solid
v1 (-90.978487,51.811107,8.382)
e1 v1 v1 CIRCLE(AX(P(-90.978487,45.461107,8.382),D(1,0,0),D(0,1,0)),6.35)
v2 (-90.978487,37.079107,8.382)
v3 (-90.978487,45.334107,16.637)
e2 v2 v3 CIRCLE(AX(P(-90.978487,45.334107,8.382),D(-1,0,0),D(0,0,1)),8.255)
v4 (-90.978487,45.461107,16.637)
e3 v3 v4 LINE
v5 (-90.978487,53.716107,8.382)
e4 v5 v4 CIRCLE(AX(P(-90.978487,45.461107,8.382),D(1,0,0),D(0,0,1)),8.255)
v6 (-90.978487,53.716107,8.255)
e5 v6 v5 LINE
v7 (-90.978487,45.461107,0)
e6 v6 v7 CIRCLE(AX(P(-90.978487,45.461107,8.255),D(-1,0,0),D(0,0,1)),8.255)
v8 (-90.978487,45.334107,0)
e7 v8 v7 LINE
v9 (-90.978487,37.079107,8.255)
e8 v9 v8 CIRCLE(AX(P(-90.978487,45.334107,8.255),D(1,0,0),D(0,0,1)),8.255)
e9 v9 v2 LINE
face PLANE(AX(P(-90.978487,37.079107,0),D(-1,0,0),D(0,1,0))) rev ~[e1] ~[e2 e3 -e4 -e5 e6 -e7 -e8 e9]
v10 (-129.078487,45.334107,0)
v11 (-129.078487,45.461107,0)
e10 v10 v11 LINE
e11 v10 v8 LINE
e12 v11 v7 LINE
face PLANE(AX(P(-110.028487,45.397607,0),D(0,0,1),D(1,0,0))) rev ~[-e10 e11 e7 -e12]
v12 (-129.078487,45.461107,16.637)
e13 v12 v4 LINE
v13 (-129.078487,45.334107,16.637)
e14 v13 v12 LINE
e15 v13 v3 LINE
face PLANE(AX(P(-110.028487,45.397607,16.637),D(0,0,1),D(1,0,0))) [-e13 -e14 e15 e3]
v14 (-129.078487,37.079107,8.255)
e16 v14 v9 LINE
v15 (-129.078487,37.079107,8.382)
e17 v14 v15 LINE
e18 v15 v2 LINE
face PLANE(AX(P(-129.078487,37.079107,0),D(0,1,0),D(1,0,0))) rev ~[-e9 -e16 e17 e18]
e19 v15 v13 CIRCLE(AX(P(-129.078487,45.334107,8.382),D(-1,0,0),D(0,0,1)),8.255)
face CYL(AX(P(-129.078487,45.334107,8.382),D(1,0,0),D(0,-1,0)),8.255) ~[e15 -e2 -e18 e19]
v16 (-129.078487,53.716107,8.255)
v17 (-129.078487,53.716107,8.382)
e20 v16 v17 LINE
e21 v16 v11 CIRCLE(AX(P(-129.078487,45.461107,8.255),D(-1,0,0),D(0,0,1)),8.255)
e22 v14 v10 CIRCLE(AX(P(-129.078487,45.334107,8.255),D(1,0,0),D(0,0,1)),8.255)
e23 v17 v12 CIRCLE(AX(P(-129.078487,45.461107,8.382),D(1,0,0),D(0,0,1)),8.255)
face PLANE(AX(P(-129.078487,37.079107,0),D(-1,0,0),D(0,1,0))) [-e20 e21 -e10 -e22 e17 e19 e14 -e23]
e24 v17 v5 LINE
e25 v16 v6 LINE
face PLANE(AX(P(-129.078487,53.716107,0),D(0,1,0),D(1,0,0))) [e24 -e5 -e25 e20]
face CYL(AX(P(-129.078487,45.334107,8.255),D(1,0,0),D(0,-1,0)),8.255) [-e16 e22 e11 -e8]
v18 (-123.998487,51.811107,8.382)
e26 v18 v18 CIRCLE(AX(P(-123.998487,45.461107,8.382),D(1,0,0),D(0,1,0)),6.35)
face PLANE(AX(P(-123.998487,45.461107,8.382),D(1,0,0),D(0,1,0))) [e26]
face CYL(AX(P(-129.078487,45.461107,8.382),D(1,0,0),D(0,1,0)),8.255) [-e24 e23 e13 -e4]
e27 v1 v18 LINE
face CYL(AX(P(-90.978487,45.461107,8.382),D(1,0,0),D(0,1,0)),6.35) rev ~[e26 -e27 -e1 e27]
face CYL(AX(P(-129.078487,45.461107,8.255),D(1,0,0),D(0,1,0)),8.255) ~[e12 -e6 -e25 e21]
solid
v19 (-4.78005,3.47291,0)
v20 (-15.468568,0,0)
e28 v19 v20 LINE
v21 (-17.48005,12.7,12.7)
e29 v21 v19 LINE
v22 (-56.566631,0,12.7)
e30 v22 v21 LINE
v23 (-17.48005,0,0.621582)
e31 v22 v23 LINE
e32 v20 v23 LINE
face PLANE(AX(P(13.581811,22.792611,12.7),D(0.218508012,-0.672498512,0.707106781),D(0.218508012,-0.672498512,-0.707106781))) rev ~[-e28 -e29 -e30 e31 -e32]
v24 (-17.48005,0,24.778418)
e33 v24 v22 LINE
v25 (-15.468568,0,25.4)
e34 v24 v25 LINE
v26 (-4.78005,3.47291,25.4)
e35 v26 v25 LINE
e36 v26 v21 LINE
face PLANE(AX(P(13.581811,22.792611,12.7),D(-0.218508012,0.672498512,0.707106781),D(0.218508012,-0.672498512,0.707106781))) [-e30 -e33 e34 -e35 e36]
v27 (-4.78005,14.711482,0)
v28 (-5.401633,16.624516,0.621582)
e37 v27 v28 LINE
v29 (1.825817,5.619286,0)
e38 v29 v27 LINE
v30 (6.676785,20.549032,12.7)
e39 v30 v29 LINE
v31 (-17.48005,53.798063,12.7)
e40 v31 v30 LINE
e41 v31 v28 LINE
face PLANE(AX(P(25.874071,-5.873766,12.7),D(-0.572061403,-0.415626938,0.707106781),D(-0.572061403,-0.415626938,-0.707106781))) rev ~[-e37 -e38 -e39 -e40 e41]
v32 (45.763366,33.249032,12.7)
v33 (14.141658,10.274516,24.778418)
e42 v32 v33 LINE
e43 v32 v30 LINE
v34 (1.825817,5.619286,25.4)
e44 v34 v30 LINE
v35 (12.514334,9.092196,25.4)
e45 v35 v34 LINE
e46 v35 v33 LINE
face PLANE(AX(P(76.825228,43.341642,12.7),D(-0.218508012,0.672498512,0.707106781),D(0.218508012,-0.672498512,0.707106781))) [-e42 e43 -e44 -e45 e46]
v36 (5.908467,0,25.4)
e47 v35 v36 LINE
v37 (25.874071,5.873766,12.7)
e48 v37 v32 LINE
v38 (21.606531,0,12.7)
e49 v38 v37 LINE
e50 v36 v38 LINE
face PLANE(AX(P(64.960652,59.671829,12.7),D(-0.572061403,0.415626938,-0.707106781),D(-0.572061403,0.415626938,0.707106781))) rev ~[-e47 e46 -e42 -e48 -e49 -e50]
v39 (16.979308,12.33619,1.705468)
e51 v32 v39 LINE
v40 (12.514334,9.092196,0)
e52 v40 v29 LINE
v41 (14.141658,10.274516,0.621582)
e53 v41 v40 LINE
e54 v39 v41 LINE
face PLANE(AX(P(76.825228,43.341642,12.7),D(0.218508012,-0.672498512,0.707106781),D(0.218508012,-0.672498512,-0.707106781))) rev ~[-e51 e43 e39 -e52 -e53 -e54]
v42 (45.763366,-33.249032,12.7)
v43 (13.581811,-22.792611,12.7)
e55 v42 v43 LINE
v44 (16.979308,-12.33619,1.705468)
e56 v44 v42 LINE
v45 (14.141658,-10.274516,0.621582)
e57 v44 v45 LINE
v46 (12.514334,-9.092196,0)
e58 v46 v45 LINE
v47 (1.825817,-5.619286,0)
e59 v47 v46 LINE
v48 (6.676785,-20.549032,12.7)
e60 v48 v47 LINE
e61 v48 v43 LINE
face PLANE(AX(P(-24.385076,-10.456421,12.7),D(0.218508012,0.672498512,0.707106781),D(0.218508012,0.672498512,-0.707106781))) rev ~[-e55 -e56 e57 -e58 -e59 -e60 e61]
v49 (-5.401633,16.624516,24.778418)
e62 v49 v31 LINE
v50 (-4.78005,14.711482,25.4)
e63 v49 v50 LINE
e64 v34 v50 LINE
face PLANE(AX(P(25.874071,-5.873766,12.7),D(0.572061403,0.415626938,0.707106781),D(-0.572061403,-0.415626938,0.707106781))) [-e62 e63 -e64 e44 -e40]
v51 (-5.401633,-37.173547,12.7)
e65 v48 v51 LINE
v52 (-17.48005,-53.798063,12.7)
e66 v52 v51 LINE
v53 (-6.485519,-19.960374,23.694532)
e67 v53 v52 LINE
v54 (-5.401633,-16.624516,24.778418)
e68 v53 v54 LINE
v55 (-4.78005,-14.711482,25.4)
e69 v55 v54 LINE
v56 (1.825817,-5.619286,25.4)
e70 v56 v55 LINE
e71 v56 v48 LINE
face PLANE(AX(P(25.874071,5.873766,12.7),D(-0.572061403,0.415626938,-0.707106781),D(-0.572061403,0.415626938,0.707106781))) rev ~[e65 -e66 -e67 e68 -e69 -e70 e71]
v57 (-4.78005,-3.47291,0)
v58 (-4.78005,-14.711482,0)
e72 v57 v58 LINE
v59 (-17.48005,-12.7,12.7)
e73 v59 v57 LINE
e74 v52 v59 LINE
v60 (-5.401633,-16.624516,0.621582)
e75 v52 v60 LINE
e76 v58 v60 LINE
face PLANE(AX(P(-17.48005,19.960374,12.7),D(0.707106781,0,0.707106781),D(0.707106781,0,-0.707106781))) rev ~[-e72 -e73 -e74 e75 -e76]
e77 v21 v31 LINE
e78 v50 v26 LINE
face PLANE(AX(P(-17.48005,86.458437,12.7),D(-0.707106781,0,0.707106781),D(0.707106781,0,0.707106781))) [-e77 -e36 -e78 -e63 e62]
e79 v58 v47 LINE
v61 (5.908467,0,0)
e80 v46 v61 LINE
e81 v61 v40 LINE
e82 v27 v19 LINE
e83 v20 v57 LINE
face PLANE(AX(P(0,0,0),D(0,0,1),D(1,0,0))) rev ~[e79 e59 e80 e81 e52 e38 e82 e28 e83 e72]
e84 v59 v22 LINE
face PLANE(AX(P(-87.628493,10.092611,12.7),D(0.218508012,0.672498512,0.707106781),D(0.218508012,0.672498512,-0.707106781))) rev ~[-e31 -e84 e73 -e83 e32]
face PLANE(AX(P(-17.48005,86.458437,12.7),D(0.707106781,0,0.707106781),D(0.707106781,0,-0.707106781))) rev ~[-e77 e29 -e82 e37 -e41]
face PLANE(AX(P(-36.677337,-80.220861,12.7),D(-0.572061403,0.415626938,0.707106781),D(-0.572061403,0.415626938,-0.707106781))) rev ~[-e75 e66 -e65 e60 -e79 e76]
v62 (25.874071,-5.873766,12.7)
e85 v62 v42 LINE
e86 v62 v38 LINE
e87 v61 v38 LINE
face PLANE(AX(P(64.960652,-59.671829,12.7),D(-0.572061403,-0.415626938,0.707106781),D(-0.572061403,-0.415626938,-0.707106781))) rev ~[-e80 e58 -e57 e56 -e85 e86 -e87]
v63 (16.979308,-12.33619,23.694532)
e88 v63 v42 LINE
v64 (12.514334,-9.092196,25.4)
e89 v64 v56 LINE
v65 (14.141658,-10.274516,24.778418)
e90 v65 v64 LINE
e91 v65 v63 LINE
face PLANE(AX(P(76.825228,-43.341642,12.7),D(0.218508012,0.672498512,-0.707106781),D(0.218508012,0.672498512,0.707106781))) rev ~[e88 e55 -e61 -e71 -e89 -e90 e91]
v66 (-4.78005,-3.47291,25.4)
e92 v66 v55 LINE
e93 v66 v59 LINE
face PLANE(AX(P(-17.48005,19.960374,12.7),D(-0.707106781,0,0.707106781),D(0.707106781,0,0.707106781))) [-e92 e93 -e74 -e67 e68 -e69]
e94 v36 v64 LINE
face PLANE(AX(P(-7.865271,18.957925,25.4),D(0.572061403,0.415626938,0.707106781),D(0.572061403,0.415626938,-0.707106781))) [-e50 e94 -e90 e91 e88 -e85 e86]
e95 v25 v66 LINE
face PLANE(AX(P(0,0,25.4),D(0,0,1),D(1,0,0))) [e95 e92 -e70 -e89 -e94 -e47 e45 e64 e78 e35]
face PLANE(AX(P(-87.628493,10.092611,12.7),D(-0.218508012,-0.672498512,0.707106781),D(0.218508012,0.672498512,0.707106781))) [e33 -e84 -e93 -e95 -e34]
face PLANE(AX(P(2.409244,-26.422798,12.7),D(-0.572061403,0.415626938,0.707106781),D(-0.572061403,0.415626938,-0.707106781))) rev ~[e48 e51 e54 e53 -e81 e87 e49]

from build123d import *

# Parameters (mm, degrees)
F1_DEPTH      = 25.4
F2_T4_DEPTH   = 106.4188112086
F2_T9_DEPTH   = 106.4188112086
F2_T14_DEPTH  = 106.4188112086
F2_T19_DEPTH  = 106.4188112086
F2_T24_DEPTH  = 106.4188112086
F2_T29_DEPTH  = 106.4188112086
F2_T34_DEPTH  = 106.4188112086
F2_T39_DEPTH  = 106.4188112086
F2_T44_DEPTH  = 106.4188112086
F2_T49_DEPTH  = 106.4188112086
F2_T54_DEPTH  = 106.4188112086
F2_T59_DEPTH  = 106.4188112086
F2_T64_DEPTH  = 106.4188112086
F2_T69_DEPTH  = 106.4188112086
F2_T74_DEPTH  = 106.4188112086
F2_T79_DEPTH  = 106.4188112086
F2_T84_DEPTH  = 106.4188112086
F2_T89_DEPTH  = 106.4188112086
F2_T94_DEPTH  = 106.4188112086
F2_T99_DEPTH  = 106.4188112086
F2_T104_DEPTH = 106.4188112086
F2_T109_DEPTH = 106.4188112086
F2_T114_DEPTH = 106.4188112086
F2_T119_DEPTH = 106.4188112086
F2_T124_DEPTH = 106.4188112086
F2_T129_DEPTH = 106.4188112086
F2_T134_DEPTH = 106.4188112086
F2_T139_DEPTH = 106.4188112086
F2_T144_DEPTH = 106.4188112086
F2_T149_DEPTH = 106.4188112086
F2_T154_DEPTH = 106.4188112086
F2_T159_DEPTH = 106.4188112086
F2_T164_DEPTH = 106.4188112086
F2_T169_DEPTH = 106.4188112086
F2_T174_DEPTH = 106.4188112086
F2_T179_DEPTH = 106.4188112086
F2_T184_DEPTH = 106.4188112086
F2_T189_DEPTH = 106.4188112086
F2_T194_DEPTH = 106.4188112086
F2_T199_DEPTH = 106.4188112086
F2_T205_DEPTH = 106.4188112086
F2_T210_DEPTH = 106.4188112086
F2_T218_DEPTH = 106.4188112086
F2_T223_DEPTH = 106.4188112086
F2_T231_DEPTH = 106.4188112086
F2_T236_DEPTH = 106.4188112086
F2_T244_DEPTH = 106.4188112086
F2_T249_DEPTH = 106.4188112086
F2_T257_DEPTH = 106.4188112086
F2_T262_DEPTH = 106.4188112086
F2_T270_DEPTH = 106.4188112086
F2_T275_DEPTH = 106.4188112086
F2_T283_DEPTH = 106.4188112086
F2_T288_DEPTH = 106.4188112086
F2_T296_DEPTH = 106.4188112086
F2_T301_DEPTH = 106.4188112086
F2_T309_DEPTH = 106.4188112086
F2_T314_DEPTH = 106.4188112086
F2_T322_DEPTH = 106.4188112086
F2_T327_DEPTH = 106.4188112086
F3_W          = 38.1
F3_H          = 16.637
F4_DEPTH      = 16.637
F5_R          = 8.255
F6_R          = 6.35
F7_DEPTH      = 33.02


# Not quite as in the source:
# - a fillet or chamfer that OpenCascade refuses, or shapes differently, is made with other operations: its cross-section is extruded or revolved along the edge and cut away or added


with BuildPart() as f1:
    # F0 (on Top) → F1 (new body)
    with BuildSketch(Plane.XY):
        Polygon((45.763366046, 33.2490316571), (6.6767851239, 20.5490316571), (-17.48005039, 53.7980633142), (-17.48005039, 12.7), (-56.5666313121, 0), (-17.48005039, -12.7), (-17.48005039, -53.7980633142), (-5.401632633, -37.1735474857), (6.6767851239, -20.5490316571), (26.220075585, -26.8990316571), (45.763366046, -33.2490316571), (33.6849482891, -16.6245158286), (27.6457394106, -8.3122579143), (21.6065305321, 0), (27.6457394106, 8.3122579143), (33.6849482891, 16.6245158286), align=None)
    extrude(amount=F1_DEPTH)

    # F2: chamfer of 12.7 on 20 edges, made by hand


with BuildPart() as f2_tool2:
    # F2_s3 → F2_t4 (new body)
    with BuildSketch(Plane(origin=(82.2268601462, 26.7171264209, 0), x_dir=(0, 0, 1), z_dir=(-0.9510565163, -0.3090169944, 0))):
        Polygon((12.7, 17.48005039), (0, 4.78005039), (0, 17.48005039), align=None)
    extrude(amount=F2_T4_DEPTH)

    split(bisect_by=Plane(origin=(14.141657828, 10.2745158286, 0), x_dir=(0, 0, 1), z_dir=(0.8090169944, 0.5877852523, 0)), keep=Keep.TOP)


with BuildPart() as f1_1:
    add(f1.part)

    # F2_t1: cut F2_tool2
    add(f2_tool2.part, mode=Mode.SUBTRACT)


with BuildPart() as f2_tool7:
    # F2_s8 → F2_t9 (new body)
    with BuildSketch(Plane(origin=(82.2268601462, 26.7171264209, 0), x_dir=(0, 0, 1), z_dir=(-0.9510565163, -0.3090169944, 0))):
        Polygon((12.7, 17.48005039), (0, 4.78005039), (0, 17.48005039), align=None)
    extrude(amount=F2_T9_DEPTH)

    split(bisect_by=Plane.YZ.offset(-17.48005039), keep=Keep.BOTTOM)


with BuildPart() as f1_2:
    add(f1_1.part)

    # F2_t6: cut F2_tool7
    add(f2_tool7.part, mode=Mode.SUBTRACT)


with BuildPart() as f2_tool12:
    # F2_s13 → F2_t14 (new body)
    with BuildSketch(Plane(origin=(11.7324134364, -16.1482817373, 0), x_dir=(0, 0, 1), z_dir=(-0.5877852523, 0.8090169944, 0))):
        Polygon((12.7, 17.48005039), (0, 4.78005039), (0, 17.48005039), align=None)
    extrude(amount=F2_T14_DEPTH)

    split(bisect_by=Plane(origin=(14.141657828, -10.2745158286, 0), x_dir=(0, 0, 1), z_dir=(0.8090169944, -0.5877852523, 0)), keep=Keep.TOP)


with BuildPart() as f1_3:
    add(f1_2.part)

    # F2_t11: cut F2_tool12
    add(f2_tool12.part, mode=Mode.SUBTRACT)


with BuildPart() as f2_tool17:
    # F2_s18 → F2_t19 (new body)
    with BuildSketch(Plane(origin=(11.7324134364, -16.1482817373, 0), x_dir=(0, 0, 1), z_dir=(-0.5877852523, 0.8090169944, 0))):
        Polygon((12.7, 17.48005039), (0, 4.78005039), (0, 17.48005039), align=None)
    extrude(amount=F2_T19_DEPTH)

    split(bisect_by=Plane(origin=(-5.401632633, 16.6245158286, 0), x_dir=(0, 0, 1), z_dir=(-0.3090169944, 0.9510565163, 0)), keep=Keep.TOP)


with BuildPart() as f1_4:
    add(f1_3.part)

    # F2_t16: cut F2_tool17
    add(f2_tool17.part, mode=Mode.SUBTRACT)


with BuildPart() as f2_tool22:
    # F2_s23 → F2_t24 (new body)
    with BuildSketch(Plane.XZ.offset(-86.4584372614)):
        Polygon((-17.48005039, 12.7), (-4.78005039, 0), (-17.48005039, 0), align=None)
    extrude(amount=F2_T24_DEPTH)

    split(bisect_by=Plane(origin=(-5.401632633, 16.6245158286, 0), x_dir=(0, 0, 1), z_dir=(-0.3090169944, 0.9510565163, 0)), keep=Keep.TOP)


with BuildPart() as f1_5:
    add(f1_4.part)

    # F2_t21: cut F2_tool22
    add(f2_tool22.part, mode=Mode.SUBTRACT)


with BuildPart() as f2_tool27:
    # F2_s28 → F2_t29 (new body)
    with BuildSketch(Plane.XZ.offset(-86.4584372614)):
        Polygon((-17.48005039, 12.7), (-4.78005039, 0), (-17.48005039, 0), align=None)
    extrude(amount=F2_T29_DEPTH)

    split(bisect_by=Plane(origin=(-5.401632633, -16.6245158286, 0), x_dir=(0, 0, 1), z_dir=(-0.3090169944, -0.9510565163, 0)), keep=Keep.TOP)


with BuildPart() as f1_6:
    add(f1_5.part)

    # F2_t26: cut F2_tool27
    add(f2_tool27.part, mode=Mode.SUBTRACT)


with BuildPart() as f2_tool32:
    # F2_s33 → F2_t34 (new body)
    with BuildSketch(Plane(origin=(18.9834437101, 6.1680947638, 0), x_dir=(0, 0, 1), z_dir=(-0.9510565163, -0.3090169944, 0))):
        Polygon((12.7, 17.48005039), (0, 4.78005039), (0, 17.48005039), align=None)
    extrude(amount=F2_T34_DEPTH)

    split(bisect_by=Plane(origin=(14.141657828, 10.2745158286, 0), x_dir=(0, 0, 1), z_dir=(0.8090169944, 0.5877852523, 0)), keep=Keep.TOP)


with BuildPart() as f1_7:
    add(f1_6.part)

    # F2_t31: cut F2_tool32
    add(f2_tool32.part, mode=Mode.SUBTRACT)


with BuildPart() as f2_tool37:
    # F2_s38 → F2_t39 (new body)
    with BuildSketch(Plane(origin=(18.9834437101, 6.1680947638, 0), x_dir=(0, 0, 1), z_dir=(-0.9510565163, -0.3090169944, 0))):
        Polygon((12.7, 17.48005039), (0, 4.78005039), (0, 17.48005039), align=None)
    extrude(amount=F2_T39_DEPTH)

    split(bisect_by=Plane.YZ.offset(-17.48005039), keep=Keep.BOTTOM)


with BuildPart() as f1_8:
    add(f1_7.part)

    # F2_t36: cut F2_tool37
    add(f2_tool37.part, mode=Mode.SUBTRACT)


with BuildPart() as f2_tool42:
    # F2_s43 → F2_t44 (new body)
    with BuildSketch(Plane(origin=(-82.2268601462, 26.7171264209, 0), x_dir=(0, 0, 1), z_dir=(0.9510565163, -0.3090169944, 0))):
        Polygon((12.7, 17.48005039), (0, 4.78005039), (0, 17.48005039), align=None)
    extrude(amount=F2_T44_DEPTH)

    split(bisect_by=Plane.YZ.offset(-17.48005039), keep=Keep.BOTTOM)


with BuildPart() as f1_9:
    add(f1_8.part)

    # F2_t41: cut F2_tool42
    add(f2_tool42.part, mode=Mode.SUBTRACT)


with BuildPart() as f2_tool47:
    # F2_s48 → F2_t49 (new body)
    with BuildSketch(Plane(origin=(-82.2268601462, 26.7171264209, 0), x_dir=(0, 0, 1), z_dir=(0.9510565163, -0.3090169944, 0))):
        Polygon((12.7, 17.48005039), (0, 4.78005039), (0, 17.48005039), align=None)
    extrude(amount=F2_T49_DEPTH)

    split(bisect_by=Plane(origin=(14.141657828, -10.2745158286, 0), x_dir=(0, 0, 1), z_dir=(0.8090169944, -0.5877852523, 0)), keep=Keep.TOP)


with BuildPart() as f1_10:
    add(f1_9.part)

    # F2_t46: cut F2_tool47
    add(f2_tool47.part, mode=Mode.SUBTRACT)


with BuildPart() as f2_tool52:
    # F2_s53 → F2_t54 (new body)
    with BuildSketch(Plane.XZ.offset(-19.9603739472)):
        Polygon((-17.48005039, 12.7), (-4.78005039, 0), (-17.48005039, 0), align=None)
    extrude(amount=F2_T54_DEPTH)

    split(bisect_by=Plane(origin=(-5.401632633, 16.6245158286, 0), x_dir=(0, 0, 1), z_dir=(-0.3090169944, 0.9510565163, 0)), keep=Keep.TOP)


with BuildPart() as f1_11:
    add(f1_10.part)

    # F2_t51: cut F2_tool52
    add(f2_tool52.part, mode=Mode.SUBTRACT)


with BuildPart() as f2_tool57:
    # F2_s58 → F2_t59 (new body)
    with BuildSketch(Plane.XZ.offset(-19.9603739472)):
        Polygon((-17.48005039, 12.7), (-4.78005039, 0), (-17.48005039, 0), align=None)
    extrude(amount=F2_T59_DEPTH)

    split(bisect_by=Plane(origin=(-5.401632633, -16.6245158286, 0), x_dir=(0, 0, 1), z_dir=(-0.3090169944, -0.9510565163, 0)), keep=Keep.TOP)


with BuildPart() as f1_12:
    add(f1_11.part)

    # F2_t56: cut F2_tool57
    add(f2_tool57.part, mode=Mode.SUBTRACT)


with BuildPart() as f2_tool62:
    # F2_s63 → F2_t64 (new body)
    with BuildSketch(Plane(origin=(-50.8189943585, -69.9463450516, 0), x_dir=(0, 0, 1), z_dir=(0.5877852523, 0.8090169944, 0))):
        Polygon((12.7, 17.48005039), (0, 4.78005039), (0, 17.48005039), align=None)
    extrude(amount=F2_T64_DEPTH)

    split(bisect_by=Plane(origin=(-5.401632633, -16.6245158286, 0), x_dir=(0, 0, 1), z_dir=(-0.3090169944, -0.9510565163, 0)), keep=Keep.TOP)


with BuildPart() as f1_13:
    add(f1_12.part)

    # F2_t61: cut F2_tool62
    add(f2_tool62.part, mode=Mode.SUBTRACT)


with BuildPart() as f2_tool67:
    # F2_s68 → F2_t69 (new body)
    with BuildSketch(Plane(origin=(-50.8189943585, -69.9463450516, 0), x_dir=(0, 0, 1), z_dir=(0.5877852523, 0.8090169944, 0))):
        Polygon((12.7, 17.48005039), (0, 4.78005039), (0, 17.48005039), align=None)
    extrude(amount=F2_T69_DEPTH)

    split(bisect_by=Plane(origin=(14.141657828, 10.2745158286, 0), x_dir=(0, 0, 1), z_dir=(0.8090169944, 0.5877852523, 0)), keep=Keep.TOP)


with BuildPart() as f1_14:
    add(f1_13.part)

    # F2_t66: cut F2_tool67
    add(f2_tool67.part, mode=Mode.SUBTRACT)


with BuildPart() as f2_tool72:
    # F2_s73 → F2_t74 (new body)
    with BuildSketch(Plane(origin=(-18.9834437101, 6.1680947638, 0), x_dir=(0, 0, 1), z_dir=(0.9510565163, -0.3090169944, 0))):
        Polygon((12.7, 17.48005039), (0, 4.78005039), (0, 17.48005039), align=None)
    extrude(amount=F2_T74_DEPTH)

    split(bisect_by=Plane.YZ.offset(-17.48005039), keep=Keep.BOTTOM)


with BuildPart() as f1_15:
    add(f1_14.part)

    # F2_t71: cut F2_tool72
    add(f2_tool72.part, mode=Mode.SUBTRACT)


with BuildPart() as f2_tool77:
    # F2_s78 → F2_t79 (new body)
    with BuildSketch(Plane(origin=(-18.9834437101, 6.1680947638, 0), x_dir=(0, 0, 1), z_dir=(0.9510565163, -0.3090169944, 0))):
        Polygon((12.7, 17.48005039), (0, 4.78005039), (0, 17.48005039), align=None)
    extrude(amount=F2_T79_DEPTH)

    split(bisect_by=Plane(origin=(14.141657828, -10.2745158286, 0), x_dir=(0, 0, 1), z_dir=(0.8090169944, -0.5877852523, 0)), keep=Keep.TOP)


with BuildPart() as f1_16:
    add(f1_15.part)

    # F2_t76: cut F2_tool77
    add(f2_tool77.part, mode=Mode.SUBTRACT)


with BuildPart() as f2_tool82:
    # F2_s83 → F2_t84 (new body)
    with BuildSketch(Plane(origin=(50.8189943585, -69.9463450516, 0), x_dir=(0, 0, 1), z_dir=(-0.5877852523, 0.8090169944, 0))):
        Polygon((12.7, 17.48005039), (0, 4.78005039), (0, 17.48005039), align=None)
    extrude(amount=F2_T84_DEPTH)

    split(bisect_by=Plane(origin=(14.141657828, -10.2745158286, 0), x_dir=(0, 0, 1), z_dir=(0.8090169944, -0.5877852523, 0)), keep=Keep.TOP)


with BuildPart() as f1_17:
    add(f1_16.part)

    # F2_t81: cut F2_tool82
    add(f2_tool82.part, mode=Mode.SUBTRACT)


with BuildPart() as f2_tool87:
    # F2_s88 → F2_t89 (new body)
    with BuildSketch(Plane(origin=(50.8189943585, -69.9463450516, 0), x_dir=(0, 0, 1), z_dir=(-0.5877852523, 0.8090169944, 0))):
        Polygon((12.7, 17.48005039), (0, 4.78005039), (0, 17.48005039), align=None)
    extrude(amount=F2_T89_DEPTH)

    split(bisect_by=Plane(origin=(-5.401632633, 16.6245158286, 0), x_dir=(0, 0, 1), z_dir=(-0.3090169944, 0.9510565163, 0)), keep=Keep.TOP)


with BuildPart() as f1_18:
    add(f1_17.part)

    # F2_t86: cut F2_tool87
    add(f2_tool87.part, mode=Mode.SUBTRACT)


with BuildPart() as f2_tool92:
    # F2_s93 → F2_t94 (new body)
    with BuildSketch(Plane(origin=(-11.7324134364, -16.1482817373, 0), x_dir=(0, 0, 1), z_dir=(0.5877852523, 0.8090169944, 0))):
        Polygon((12.7, 17.48005039), (0, 4.78005039), (0, 17.48005039), align=None)
    extrude(amount=F2_T94_DEPTH)

    split(bisect_by=Plane(origin=(-5.401632633, -16.6245158286, 0), x_dir=(0, 0, 1), z_dir=(-0.3090169944, -0.9510565163, 0)), keep=Keep.TOP)


with BuildPart() as f1_19:
    add(f1_18.part)

    # F2_t91: cut F2_tool92
    add(f2_tool92.part, mode=Mode.SUBTRACT)


with BuildPart() as f2_tool97:
    # F2_s98 → F2_t99 (new body)
    with BuildSketch(Plane(origin=(-11.7324134364, -16.1482817373, 0), x_dir=(0, 0, 1), z_dir=(0.5877852523, 0.8090169944, 0))):
        Polygon((12.7, 17.48005039), (0, 4.78005039), (0, 17.48005039), align=None)
    extrude(amount=F2_T99_DEPTH)

    split(bisect_by=Plane(origin=(14.141657828, 10.2745158286, 0), x_dir=(0, 0, 1), z_dir=(0.8090169944, 0.5877852523, 0)), keep=Keep.TOP)


with BuildPart() as f1_20:
    add(f1_19.part)

    # F2_t96: cut F2_tool97
    add(f2_tool97.part, mode=Mode.SUBTRACT)


with BuildPart() as f2_tool102:
    # F2_s103 → F2_t104 (new body)
    with BuildSketch(Plane(origin=(50.8189943585, 69.9463450516, 0), x_dir=(0, 0, 1), z_dir=(-0.5877852523, -0.8090169944, 0))):
        Polygon((12.7, -17.48005039), (25.4, -4.78005039), (25.4, -17.48005039), align=None)
    extrude(amount=F2_T104_DEPTH)

    split(bisect_by=Plane(origin=(14.141657828, 10.2745158286, 0), x_dir=(0, 0, 1), z_dir=(0.8090169944, 0.5877852523, 0)), keep=Keep.TOP)


with BuildPart() as f1_21:
    add(f1_20.part)

    # F2_t101: cut F2_tool102
    add(f2_tool102.part, mode=Mode.SUBTRACT)


with BuildPart() as f2_tool107:
    # F2_s108 → F2_t109 (new body)
    with BuildSketch(Plane(origin=(50.8189943585, 69.9463450516, 0), x_dir=(0, 0, 1), z_dir=(-0.5877852523, -0.8090169944, 0))):
        Polygon((12.7, -17.48005039), (25.4, -4.78005039), (25.4, -17.48005039), align=None)
    extrude(amount=F2_T109_DEPTH)

    split(bisect_by=Plane(origin=(-5.401632633, -16.6245158286, 0), x_dir=(0, 0, 1), z_dir=(-0.3090169944, -0.9510565163, 0)), keep=Keep.TOP)


with BuildPart() as f1_22:
    add(f1_21.part)

    # F2_t106: cut F2_tool107
    add(f2_tool107.part, mode=Mode.SUBTRACT)


with BuildPart() as f2_tool112:
    # F2_s113 → F2_t114 (new body)
    with BuildSketch(Plane(origin=(82.2268601462, 26.7171264209, 0), x_dir=(0, 0, 1), z_dir=(-0.9510565163, -0.3090169944, 0))):
        Polygon((12.7, 17.48005039), (25.4, 4.78005039), (25.4, 17.48005039), align=None)
    extrude(amount=F2_T114_DEPTH)

    split(bisect_by=Plane(origin=(14.141657828, 10.2745158286, 0), x_dir=(0, 0, 1), z_dir=(0.8090169944, 0.5877852523, 0)), keep=Keep.TOP)


with BuildPart() as f1_23:
    add(f1_22.part)

    # F2_t111: cut F2_tool112
    add(f2_tool112.part, mode=Mode.SUBTRACT)


with BuildPart() as f2_tool117:
    # F2_s118 → F2_t119 (new body)
    with BuildSketch(Plane(origin=(82.2268601462, 26.7171264209, 0), x_dir=(0, 0, 1), z_dir=(-0.9510565163, -0.3090169944, 0))):
        Polygon((12.7, 17.48005039), (25.4, 4.78005039), (25.4, 17.48005039), align=None)
    extrude(amount=F2_T119_DEPTH)

    split(bisect_by=Plane.YZ.offset(-17.48005039), keep=Keep.BOTTOM)


with BuildPart() as f1_24:
    add(f1_23.part)

    # F2_t116: cut F2_tool117
    add(f2_tool117.part, mode=Mode.SUBTRACT)


with BuildPart() as f2_tool122:
    # F2_s123 → F2_t124 (new body)
    with BuildSketch(Plane(origin=(11.7324134364, -16.1482817373, 0), x_dir=(0, 0, 1), z_dir=(-0.5877852523, 0.8090169944, 0))):
        Polygon((12.7, 17.48005039), (25.4, 4.78005039), (25.4, 17.48005039), align=None)
    extrude(amount=F2_T124_DEPTH)

    split(bisect_by=Plane(origin=(14.141657828, -10.2745158286, 0), x_dir=(0, 0, 1), z_dir=(0.8090169944, -0.5877852523, 0)), keep=Keep.TOP)


with BuildPart() as f1_25:
    add(f1_24.part)

    # F2_t121: cut F2_tool122
    add(f2_tool122.part, mode=Mode.SUBTRACT)


with BuildPart() as f2_tool127:
    # F2_s128 → F2_t129 (new body)
    with BuildSketch(Plane(origin=(11.7324134364, -16.1482817373, 0), x_dir=(0, 0, 1), z_dir=(-0.5877852523, 0.8090169944, 0))):
        Polygon((12.7, 17.48005039), (25.4, 4.78005039), (25.4, 17.48005039), align=None)
    extrude(amount=F2_T129_DEPTH)

    split(bisect_by=Plane(origin=(-5.401632633, 16.6245158286, 0), x_dir=(0, 0, 1), z_dir=(-0.3090169944, 0.9510565163, 0)), keep=Keep.TOP)


with BuildPart() as f1_26:
    add(f1_25.part)

    # F2_t126: cut F2_tool127
    add(f2_tool127.part, mode=Mode.SUBTRACT)


with BuildPart() as f2_tool132:
    # F2_s133 → F2_t134 (new body)
    with BuildSketch(Plane.XZ.offset(-86.4584372614)):
        Polygon((-17.48005039, 12.7), (-4.78005039, 25.4), (-17.48005039, 25.4), align=None)
    extrude(amount=F2_T134_DEPTH)

    split(bisect_by=Plane(origin=(-5.401632633, 16.6245158286, 0), x_dir=(0, 0, 1), z_dir=(-0.3090169944, 0.9510565163, 0)), keep=Keep.TOP)


with BuildPart() as f1_27:
    add(f1_26.part)

    # F2_t131: cut F2_tool132
    add(f2_tool132.part, mode=Mode.SUBTRACT)


with BuildPart() as f2_tool137:
    # F2_s138 → F2_t139 (new body)
    with BuildSketch(Plane.XZ.offset(-86.4584372614)):
        Polygon((-17.48005039, 12.7), (-4.78005039, 25.4), (-17.48005039, 25.4), align=None)
    extrude(amount=F2_T139_DEPTH)

    split(bisect_by=Plane(origin=(-5.401632633, -16.6245158286, 0), x_dir=(0, 0, 1), z_dir=(-0.3090169944, -0.9510565163, 0)), keep=Keep.TOP)


with BuildPart() as f1_28:
    add(f1_27.part)

    # F2_t136: cut F2_tool137
    add(f2_tool137.part, mode=Mode.SUBTRACT)


with BuildPart() as f2_tool142:
    # F2_s143 → F2_t144 (new body)
    with BuildSketch(Plane(origin=(18.9834437101, 6.1680947638, 0), x_dir=(0, 0, 1), z_dir=(-0.9510565163, -0.3090169944, 0))):
        Polygon((12.7, 17.48005039), (25.4, 4.78005039), (25.4, 17.48005039), align=None)
    extrude(amount=F2_T144_DEPTH)

    split(bisect_by=Plane(origin=(14.141657828, 10.2745158286, 0), x_dir=(0, 0, 1), z_dir=(0.8090169944, 0.5877852523, 0)), keep=Keep.TOP)


with BuildPart() as f1_29:
    add(f1_28.part)

    # F2_t141: cut F2_tool142
    add(f2_tool142.part, mode=Mode.SUBTRACT)


with BuildPart() as f2_tool147:
    # F2_s148 → F2_t149 (new body)
    with BuildSketch(Plane(origin=(18.9834437101, 6.1680947638, 0), x_dir=(0, 0, 1), z_dir=(-0.9510565163, -0.3090169944, 0))):
        Polygon((12.7, 17.48005039), (25.4, 4.78005039), (25.4, 17.48005039), align=None)
    extrude(amount=F2_T149_DEPTH)

    split(bisect_by=Plane.YZ.offset(-17.48005039), keep=Keep.BOTTOM)


with BuildPart() as f1_30:
    add(f1_29.part)

    # F2_t146: cut F2_tool147
    add(f2_tool147.part, mode=Mode.SUBTRACT)


with BuildPart() as f2_tool152:
    # F2_s153 → F2_t154 (new body)
    with BuildSketch(Plane(origin=(-82.2268601462, 26.7171264209, 0), x_dir=(0, 0, 1), z_dir=(0.9510565163, -0.3090169944, 0))):
        Polygon((12.7, 17.48005039), (25.4, 4.78005039), (25.4, 17.48005039), align=None)
    extrude(amount=F2_T154_DEPTH)

    split(bisect_by=Plane.YZ.offset(-17.48005039), keep=Keep.BOTTOM)


with BuildPart() as f1_31:
    add(f1_30.part)

    # F2_t151: cut F2_tool152
    add(f2_tool152.part, mode=Mode.SUBTRACT)


with BuildPart() as f2_tool157:
    # F2_s158 → F2_t159 (new body)
    with BuildSketch(Plane(origin=(-82.2268601462, 26.7171264209, 0), x_dir=(0, 0, 1), z_dir=(0.9510565163, -0.3090169944, 0))):
        Polygon((12.7, 17.48005039), (25.4, 4.78005039), (25.4, 17.48005039), align=None)
    extrude(amount=F2_T159_DEPTH)

    split(bisect_by=Plane(origin=(14.141657828, -10.2745158286, 0), x_dir=(0, 0, 1), z_dir=(0.8090169944, -0.5877852523, 0)), keep=Keep.TOP)


with BuildPart() as f1_32:
    add(f1_31.part)

    # F2_t156: cut F2_tool157
    add(f2_tool157.part, mode=Mode.SUBTRACT)


with BuildPart() as f2_tool162:
    # F2_s163 → F2_t164 (new body)
    with BuildSketch(Plane.XZ.offset(-19.9603739472)):
        Polygon((-17.48005039, 12.7), (-4.78005039, 25.4), (-17.48005039, 25.4), align=None)
    extrude(amount=F2_T164_DEPTH)

    split(bisect_by=Plane(origin=(-5.401632633, 16.6245158286, 0), x_dir=(0, 0, 1), z_dir=(-0.3090169944, 0.9510565163, 0)), keep=Keep.TOP)


with BuildPart() as f1_33:
    add(f1_32.part)

    # F2_t161: cut F2_tool162
    add(f2_tool162.part, mode=Mode.SUBTRACT)


with BuildPart() as f2_tool167:
    # F2_s168 → F2_t169 (new body)
    with BuildSketch(Plane.XZ.offset(-19.9603739472)):
        Polygon((-17.48005039, 12.7), (-4.78005039, 25.4), (-17.48005039, 25.4), align=None)
    extrude(amount=F2_T169_DEPTH)

    split(bisect_by=Plane(origin=(-5.401632633, -16.6245158286, 0), x_dir=(0, 0, 1), z_dir=(-0.3090169944, -0.9510565163, 0)), keep=Keep.TOP)


with BuildPart() as f1_34:
    add(f1_33.part)

    # F2_t166: cut F2_tool167
    add(f2_tool167.part, mode=Mode.SUBTRACT)


with BuildPart() as f2_tool172:
    # F2_s173 → F2_t174 (new body)
    with BuildSketch(Plane(origin=(11.7324134364, 16.1482817373, 0), x_dir=(0, 0, 1), z_dir=(-0.5877852523, -0.8090169944, 0))):
        Polygon((12.7, -17.48005039), (25.4, -4.78005039), (25.4, -17.48005039), align=None)
    extrude(amount=F2_T174_DEPTH)

    split(bisect_by=Plane(origin=(14.141657828, 10.2745158286, 0), x_dir=(0, 0, 1), z_dir=(0.8090169944, 0.5877852523, 0)), keep=Keep.TOP)


with BuildPart() as f1_35:
    add(f1_34.part)

    # F2_t171: cut F2_tool172
    add(f2_tool172.part, mode=Mode.SUBTRACT)


with BuildPart() as f2_tool177:
    # F2_s178 → F2_t179 (new body)
    with BuildSketch(Plane(origin=(11.7324134364, 16.1482817373, 0), x_dir=(0, 0, 1), z_dir=(-0.5877852523, -0.8090169944, 0))):
        Polygon((12.7, -17.48005039), (25.4, -4.78005039), (25.4, -17.48005039), align=None)
    extrude(amount=F2_T179_DEPTH)

    split(bisect_by=Plane(origin=(-5.401632633, -16.6245158286, 0), x_dir=(0, 0, 1), z_dir=(-0.3090169944, -0.9510565163, 0)), keep=Keep.TOP)


with BuildPart() as f1_36:
    add(f1_35.part)

    # F2_t176: cut F2_tool177
    add(f2_tool177.part, mode=Mode.SUBTRACT)


with BuildPart() as f2_tool182:
    # F2_s183 → F2_t184 (new body)
    with BuildSketch(Plane(origin=(82.2268601462, -26.7171264209, 0), x_dir=(0, 0, 1), z_dir=(-0.9510565163, 0.3090169944, 0))):
        Polygon((12.7, -17.48005039), (25.4, -4.78005039), (25.4, -17.48005039), align=None)
    extrude(amount=F2_T184_DEPTH)

    split(bisect_by=Plane(origin=(14.141657828, -10.2745158286, 0), x_dir=(0, 0, 1), z_dir=(0.8090169944, -0.5877852523, 0)), keep=Keep.TOP)


with BuildPart() as f1_37:
    add(f1_36.part)

    # F2_t181: cut F2_tool182
    add(f2_tool182.part, mode=Mode.SUBTRACT)


with BuildPart() as f2_tool187:
    # F2_s188 → F2_t189 (new body)
    with BuildSketch(Plane(origin=(82.2268601462, -26.7171264209, 0), x_dir=(0, 0, 1), z_dir=(-0.9510565163, 0.3090169944, 0))):
        Polygon((12.7, -17.48005039), (25.4, -4.78005039), (25.4, -17.48005039), align=None)
    extrude(amount=F2_T189_DEPTH)

    split(bisect_by=Plane.YZ.offset(-17.48005039), keep=Keep.BOTTOM)


with BuildPart() as f1_38:
    add(f1_37.part)

    # F2_t186: cut F2_tool187
    add(f2_tool187.part, mode=Mode.SUBTRACT)


with BuildPart() as f2_tool192:
    # F2_s193 → F2_t194 (new body)
    with BuildSketch(Plane(origin=(-11.7324134364, 16.1482817373, 0), x_dir=(0, 0, 1), z_dir=(0.5877852523, -0.8090169944, 0))):
        Polygon((25.4, -4.78005039), (12.7, -17.48005039), (25.4, -17.48005039), align=None)
    extrude(amount=F2_T194_DEPTH)

    split(bisect_by=Plane(origin=(-5.401632633, 16.6245158286, 0), x_dir=(0, 0, 1), z_dir=(-0.3090169944, 0.9510565163, 0)), keep=Keep.TOP)


with BuildPart() as f1_39:
    add(f1_38.part)

    # F2_t191: cut F2_tool192
    add(f2_tool192.part, mode=Mode.SUBTRACT)


with BuildPart() as f2_tool197:
    # F2_s198 → F2_t199 (new body)
    with BuildSketch(Plane(origin=(-11.7324134364, 16.1482817373, 0), x_dir=(0, 0, 1), z_dir=(0.5877852523, -0.8090169944, 0))):
        Polygon((25.4, -4.78005039), (12.7, -17.48005039), (25.4, -17.48005039), align=None)
    extrude(amount=F2_T199_DEPTH)

    split(bisect_by=Plane(origin=(14.141657828, -10.2745158286, 0), x_dir=(0, 0, 1), z_dir=(0.8090169944, -0.5877852523, 0)), keep=Keep.TOP)


with BuildPart() as f1_40:
    add(f1_39.part)

    # F2_t196: cut F2_tool197
    add(f2_tool197.part, mode=Mode.SUBTRACT)


with BuildPart() as f2_tool203:
    # F2_s204 → F2_t205 (new body)
    with BuildSketch(Plane(origin=(82.2268601462, 26.7171264209, 0), x_dir=(0, 0, 1), z_dir=(-0.9510565163, -0.3090169944, 0))):
        Polygon((12.7, 17.48005039), (0, 4.78005039), (0, 17.48005039), align=None)
    extrude(amount=F2_T205_DEPTH)

    split(bisect_by=Plane(origin=(14.141657828, 10.2745158286, 0), x_dir=(0, 0, 1), z_dir=(-0.8090169944, -0.5877852523, 0)), keep=Keep.TOP)

    split(bisect_by=Plane.YZ.offset(-17.48005039), keep=Keep.TOP)


with BuildPart() as f2_tool208:
    # F2_s209 → F2_t210 (new body)
    with BuildSketch(Plane(origin=(11.7324134364, -16.1482817373, 0), x_dir=(0, 0, 1), z_dir=(-0.5877852523, 0.8090169944, 0))):
        Polygon((12.7, 17.48005039), (0, 4.78005039), (0, 17.48005039), align=None)
    extrude(amount=F2_T210_DEPTH)

    split(bisect_by=Plane(origin=(14.141657828, -10.2745158286, 0), x_dir=(0, 0, 1), z_dir=(-0.8090169944, 0.5877852523, 0)), keep=Keep.TOP)

    split(bisect_by=Plane(origin=(-5.401632633, 16.6245158286, 0), x_dir=(0, 0, 1), z_dir=(0.3090169944, -0.9510565163, 0)), keep=Keep.TOP)


with BuildPart() as f2_tool203_1:
    add(f2_tool203.part)

    # F2_t213: intersect F2_tool208
    add(f2_tool208.part, mode=Mode.INTERSECT)


with BuildPart() as f1_41:
    add(f1_40.part)

    # F2_t201: cut F2_tool203
    add(f2_tool203_1.part, mode=Mode.SUBTRACT)


with BuildPart() as f2_tool216:
    # F2_s217 → F2_t218 (new body)
    with BuildSketch(Plane.XZ.offset(-86.4584372614)):
        Polygon((-17.48005039, 12.7), (-4.78005039, 0), (-17.48005039, 0), align=None)
    extrude(amount=F2_T218_DEPTH)

    split(bisect_by=Plane(origin=(-5.401632633, 16.6245158286, 0), x_dir=(0, 0, 1), z_dir=(0.3090169944, -0.9510565163, 0)), keep=Keep.TOP)

    split(bisect_by=Plane(origin=(-5.401632633, -16.6245158286, 0), x_dir=(0, 0, 1), z_dir=(0.3090169944, 0.9510565163, 0)), keep=Keep.TOP)


with BuildPart() as f2_tool221:
    # F2_s222 → F2_t223 (new body)
    with BuildSketch(Plane(origin=(18.9834437101, 6.1680947638, 0), x_dir=(0, 0, 1), z_dir=(-0.9510565163, -0.3090169944, 0))):
        Polygon((12.7, 17.48005039), (0, 4.78005039), (0, 17.48005039), align=None)
    extrude(amount=F2_T223_DEPTH)

    split(bisect_by=Plane(origin=(14.141657828, 10.2745158286, 0), x_dir=(0, 0, 1), z_dir=(-0.8090169944, -0.5877852523, 0)), keep=Keep.TOP)

    split(bisect_by=Plane.YZ.offset(-17.48005039), keep=Keep.TOP)


with BuildPart() as f2_tool216_1:
    add(f2_tool216.part)

    # F2_t226: intersect F2_tool221
    add(f2_tool221.part, mode=Mode.INTERSECT)


with BuildPart() as f1_42:
    add(f1_41.part)

    # F2_t214: cut F2_tool216
    add(f2_tool216_1.part, mode=Mode.SUBTRACT)


with BuildPart() as f2_tool229:
    # F2_s230 → F2_t231 (new body)
    with BuildSketch(Plane(origin=(-82.2268601462, 26.7171264209, 0), x_dir=(0, 0, 1), z_dir=(0.9510565163, -0.3090169944, 0))):
        Polygon((12.7, 17.48005039), (0, 4.78005039), (0, 17.48005039), align=None)
    extrude(amount=F2_T231_DEPTH)

    split(bisect_by=Plane.YZ.offset(-17.48005039), keep=Keep.TOP)

    split(bisect_by=Plane(origin=(14.141657828, -10.2745158286, 0), x_dir=(0, 0, 1), z_dir=(-0.8090169944, 0.5877852523, 0)), keep=Keep.TOP)


with BuildPart() as f2_tool234:
    # F2_s235 → F2_t236 (new body)
    with BuildSketch(Plane.XZ.offset(-19.9603739472)):
        Polygon((-17.48005039, 12.7), (-4.78005039, 0), (-17.48005039, 0), align=None)
    extrude(amount=F2_T236_DEPTH)

    split(bisect_by=Plane(origin=(-5.401632633, 16.6245158286, 0), x_dir=(0, 0, 1), z_dir=(0.3090169944, -0.9510565163, 0)), keep=Keep.TOP)

    split(bisect_by=Plane(origin=(-5.401632633, -16.6245158286, 0), x_dir=(0, 0, 1), z_dir=(0.3090169944, 0.9510565163, 0)), keep=Keep.TOP)


with BuildPart() as f2_tool229_1:
    add(f2_tool229.part)

    # F2_t239: intersect F2_tool234
    add(f2_tool234.part, mode=Mode.INTERSECT)


with BuildPart() as f1_43:
    add(f1_42.part)

    # F2_t227: cut F2_tool229
    add(f2_tool229_1.part, mode=Mode.SUBTRACT)


with BuildPart() as f2_tool242:
    # F2_s243 → F2_t244 (new body)
    with BuildSketch(Plane(origin=(-50.8189943585, -69.9463450516, 0), x_dir=(0, 0, 1), z_dir=(0.5877852523, 0.8090169944, 0))):
        Polygon((12.7, 17.48005039), (0, 4.78005039), (0, 17.48005039), align=None)
    extrude(amount=F2_T244_DEPTH)

    split(bisect_by=Plane(origin=(14.141657828, 10.2745158286, 0), x_dir=(0, 0, 1), z_dir=(-0.8090169944, -0.5877852523, 0)), keep=Keep.TOP)

    split(bisect_by=Plane(origin=(-5.401632633, -16.6245158286, 0), x_dir=(0, 0, 1), z_dir=(0.3090169944, 0.9510565163, 0)), keep=Keep.TOP)


with BuildPart() as f2_tool247:
    # F2_s248 → F2_t249 (new body)
    with BuildSketch(Plane(origin=(-18.9834437101, 6.1680947638, 0), x_dir=(0, 0, 1), z_dir=(0.9510565163, -0.3090169944, 0))):
        Polygon((12.7, 17.48005039), (0, 4.78005039), (0, 17.48005039), align=None)
    extrude(amount=F2_T249_DEPTH)

    split(bisect_by=Plane.YZ.offset(-17.48005039), keep=Keep.TOP)

    split(bisect_by=Plane(origin=(14.141657828, -10.2745158286, 0), x_dir=(0, 0, 1), z_dir=(-0.8090169944, 0.5877852523, 0)), keep=Keep.TOP)


with BuildPart() as f2_tool242_1:
    add(f2_tool242.part)

    # F2_t252: intersect F2_tool247
    add(f2_tool247.part, mode=Mode.INTERSECT)


with BuildPart() as f1_44:
    add(f1_43.part)

    # F2_t240: cut F2_tool242
    add(f2_tool242_1.part, mode=Mode.SUBTRACT)


with BuildPart() as f2_tool255:
    # F2_s256 → F2_t257 (new body)
    with BuildSketch(Plane(origin=(-11.7324134364, -16.1482817373, 0), x_dir=(0, 0, 1), z_dir=(0.5877852523, 0.8090169944, 0))):
        Polygon((12.7, 17.48005039), (0, 4.78005039), (0, 17.48005039), align=None)
    extrude(amount=F2_T257_DEPTH)

    split(bisect_by=Plane(origin=(14.141657828, 10.2745158286, 0), x_dir=(0, 0, 1), z_dir=(-0.8090169944, -0.5877852523, 0)), keep=Keep.TOP)

    split(bisect_by=Plane(origin=(-5.401632633, -16.6245158286, 0), x_dir=(0, 0, 1), z_dir=(0.3090169944, 0.9510565163, 0)), keep=Keep.TOP)


with BuildPart() as f2_tool260:
    # F2_s261 → F2_t262 (new body)
    with BuildSketch(Plane(origin=(50.8189943585, -69.9463450516, 0), x_dir=(0, 0, 1), z_dir=(-0.5877852523, 0.8090169944, 0))):
        Polygon((12.7, 17.48005039), (0, 4.78005039), (0, 17.48005039), align=None)
    extrude(amount=F2_T262_DEPTH)

    split(bisect_by=Plane(origin=(14.141657828, -10.2745158286, 0), x_dir=(0, 0, 1), z_dir=(-0.8090169944, 0.5877852523, 0)), keep=Keep.TOP)

    split(bisect_by=Plane(origin=(-5.401632633, 16.6245158286, 0), x_dir=(0, 0, 1), z_dir=(0.3090169944, -0.9510565163, 0)), keep=Keep.TOP)


with BuildPart() as f2_tool255_1:
    add(f2_tool255.part)

    # F2_t265: intersect F2_tool260
    add(f2_tool260.part, mode=Mode.INTERSECT)


with BuildPart() as f1_45:
    add(f1_44.part)

    # F2_t253: cut F2_tool255
    add(f2_tool255_1.part, mode=Mode.SUBTRACT)


with BuildPart() as f2_tool268:
    # F2_s269 → F2_t270 (new body)
    with BuildSketch(Plane(origin=(50.8189943585, 69.9463450516, 0), x_dir=(0, 0, 1), z_dir=(-0.5877852523, -0.8090169944, 0))):
        Polygon((12.7, -17.48005039), (25.4, -4.78005039), (25.4, -17.48005039), align=None)
    extrude(amount=F2_T270_DEPTH)

    split(bisect_by=Plane(origin=(14.141657828, 10.2745158286, 0), x_dir=(0, 0, 1), z_dir=(-0.8090169944, -0.5877852523, 0)), keep=Keep.TOP)

    split(bisect_by=Plane(origin=(-5.401632633, -16.6245158286, 0), x_dir=(0, 0, 1), z_dir=(0.3090169944, 0.9510565163, 0)), keep=Keep.TOP)


with BuildPart() as f2_tool273:
    # F2_s274 → F2_t275 (new body)
    with BuildSketch(Plane(origin=(-11.7324134364, 16.1482817373, 0), x_dir=(0, 0, 1), z_dir=(0.5877852523, -0.8090169944, 0))):
        Polygon((25.4, -4.78005039), (12.7, -17.48005039), (25.4, -17.48005039), align=None)
    extrude(amount=F2_T275_DEPTH)

    split(bisect_by=Plane(origin=(14.141657828, -10.2745158286, 0), x_dir=(0, 0, 1), z_dir=(-0.8090169944, 0.5877852523, 0)), keep=Keep.TOP)

    split(bisect_by=Plane(origin=(-5.401632633, 16.6245158286, 0), x_dir=(0, 0, 1), z_dir=(0.3090169944, -0.9510565163, 0)), keep=Keep.TOP)


with BuildPart() as f2_tool268_1:
    add(f2_tool268.part)

    # F2_t278: intersect F2_tool273
    add(f2_tool273.part, mode=Mode.INTERSECT)


with BuildPart() as f1_46:
    add(f1_45.part)

    # F2_t266: cut F2_tool268
    add(f2_tool268_1.part, mode=Mode.SUBTRACT)


with BuildPart() as f2_tool281:
    # F2_s282 → F2_t283 (new body)
    with BuildSketch(Plane(origin=(82.2268601462, 26.7171264209, 0), x_dir=(0, 0, 1), z_dir=(-0.9510565163, -0.3090169944, 0))):
        Polygon((12.7, 17.48005039), (25.4, 4.78005039), (25.4, 17.48005039), align=None)
    extrude(amount=F2_T283_DEPTH)

    split(bisect_by=Plane(origin=(14.141657828, 10.2745158286, 0), x_dir=(0, 0, 1), z_dir=(-0.8090169944, -0.5877852523, 0)), keep=Keep.TOP)

    split(bisect_by=Plane.YZ.offset(-17.48005039), keep=Keep.TOP)


with BuildPart() as f2_tool286:
    # F2_s287 → F2_t288 (new body)
    with BuildSketch(Plane(origin=(11.7324134364, -16.1482817373, 0), x_dir=(0, 0, 1), z_dir=(-0.5877852523, 0.8090169944, 0))):
        Polygon((12.7, 17.48005039), (25.4, 4.78005039), (25.4, 17.48005039), align=None)
    extrude(amount=F2_T288_DEPTH)

    split(bisect_by=Plane(origin=(14.141657828, -10.2745158286, 0), x_dir=(0, 0, 1), z_dir=(-0.8090169944, 0.5877852523, 0)), keep=Keep.TOP)

    split(bisect_by=Plane(origin=(-5.401632633, 16.6245158286, 0), x_dir=(0, 0, 1), z_dir=(0.3090169944, -0.9510565163, 0)), keep=Keep.TOP)


with BuildPart() as f2_tool281_1:
    add(f2_tool281.part)

    # F2_t291: intersect F2_tool286
    add(f2_tool286.part, mode=Mode.INTERSECT)


with BuildPart() as f1_47:
    add(f1_46.part)

    # F2_t279: cut F2_tool281
    add(f2_tool281_1.part, mode=Mode.SUBTRACT)


with BuildPart() as f2_tool294:
    # F2_s295 → F2_t296 (new body)
    with BuildSketch(Plane.XZ.offset(-86.4584372614)):
        Polygon((-17.48005039, 12.7), (-4.78005039, 25.4), (-17.48005039, 25.4), align=None)
    extrude(amount=F2_T296_DEPTH)

    split(bisect_by=Plane(origin=(-5.401632633, 16.6245158286, 0), x_dir=(0, 0, 1), z_dir=(0.3090169944, -0.9510565163, 0)), keep=Keep.TOP)

    split(bisect_by=Plane(origin=(-5.401632633, -16.6245158286, 0), x_dir=(0, 0, 1), z_dir=(0.3090169944, 0.9510565163, 0)), keep=Keep.TOP)


with BuildPart() as f2_tool299:
    # F2_s300 → F2_t301 (new body)
    with BuildSketch(Plane(origin=(18.9834437101, 6.1680947638, 0), x_dir=(0, 0, 1), z_dir=(-0.9510565163, -0.3090169944, 0))):
        Polygon((12.7, 17.48005039), (25.4, 4.78005039), (25.4, 17.48005039), align=None)
    extrude(amount=F2_T301_DEPTH)

    split(bisect_by=Plane(origin=(14.141657828, 10.2745158286, 0), x_dir=(0, 0, 1), z_dir=(-0.8090169944, -0.5877852523, 0)), keep=Keep.TOP)

    split(bisect_by=Plane.YZ.offset(-17.48005039), keep=Keep.TOP)


with BuildPart() as f2_tool294_1:
    add(f2_tool294.part)

    # F2_t304: intersect F2_tool299
    add(f2_tool299.part, mode=Mode.INTERSECT)


with BuildPart() as f1_48:
    add(f1_47.part)

    # F2_t292: cut F2_tool294
    add(f2_tool294_1.part, mode=Mode.SUBTRACT)


with BuildPart() as f2_tool307:
    # F2_s308 → F2_t309 (new body)
    with BuildSketch(Plane(origin=(-82.2268601462, 26.7171264209, 0), x_dir=(0, 0, 1), z_dir=(0.9510565163, -0.3090169944, 0))):
        Polygon((12.7, 17.48005039), (25.4, 4.78005039), (25.4, 17.48005039), align=None)
    extrude(amount=F2_T309_DEPTH)

    split(bisect_by=Plane.YZ.offset(-17.48005039), keep=Keep.TOP)

    split(bisect_by=Plane(origin=(14.141657828, -10.2745158286, 0), x_dir=(0, 0, 1), z_dir=(-0.8090169944, 0.5877852523, 0)), keep=Keep.TOP)


with BuildPart() as f2_tool312:
    # F2_s313 → F2_t314 (new body)
    with BuildSketch(Plane.XZ.offset(-19.9603739472)):
        Polygon((-17.48005039, 12.7), (-4.78005039, 25.4), (-17.48005039, 25.4), align=None)
    extrude(amount=F2_T314_DEPTH)

    split(bisect_by=Plane(origin=(-5.401632633, 16.6245158286, 0), x_dir=(0, 0, 1), z_dir=(0.3090169944, -0.9510565163, 0)), keep=Keep.TOP)

    split(bisect_by=Plane(origin=(-5.401632633, -16.6245158286, 0), x_dir=(0, 0, 1), z_dir=(0.3090169944, 0.9510565163, 0)), keep=Keep.TOP)


with BuildPart() as f2_tool307_1:
    add(f2_tool307.part)

    # F2_t317: intersect F2_tool312
    add(f2_tool312.part, mode=Mode.INTERSECT)


with BuildPart() as f1_49:
    add(f1_48.part)

    # F2_t305: cut F2_tool307
    add(f2_tool307_1.part, mode=Mode.SUBTRACT)


with BuildPart() as f2_tool320:
    # F2_s321 → F2_t322 (new body)
    with BuildSketch(Plane(origin=(11.7324134364, 16.1482817373, 0), x_dir=(0, 0, 1), z_dir=(-0.5877852523, -0.8090169944, 0))):
        Polygon((12.7, -17.48005039), (25.4, -4.78005039), (25.4, -17.48005039), align=None)
    extrude(amount=F2_T322_DEPTH)

    split(bisect_by=Plane(origin=(14.141657828, 10.2745158286, 0), x_dir=(0, 0, 1), z_dir=(-0.8090169944, -0.5877852523, 0)), keep=Keep.TOP)

    split(bisect_by=Plane(origin=(-5.401632633, -16.6245158286, 0), x_dir=(0, 0, 1), z_dir=(0.3090169944, 0.9510565163, 0)), keep=Keep.TOP)


with BuildPart() as f2_tool325:
    # F2_s326 → F2_t327 (new body)
    with BuildSketch(Plane(origin=(82.2268601462, -26.7171264209, 0), x_dir=(0, 0, 1), z_dir=(-0.9510565163, 0.3090169944, 0))):
        Polygon((12.7, -17.48005039), (25.4, -4.78005039), (25.4, -17.48005039), align=None)
    extrude(amount=F2_T327_DEPTH)

    split(bisect_by=Plane.YZ.offset(-17.48005039), keep=Keep.TOP)

    split(bisect_by=Plane(origin=(14.141657828, -10.2745158286, 0), x_dir=(0, 0, 1), z_dir=(-0.8090169944, 0.5877852523, 0)), keep=Keep.TOP)


with BuildPart() as f2_tool320_1:
    add(f2_tool320.part)

    # F2_t330: intersect F2_tool325
    add(f2_tool325.part, mode=Mode.INTERSECT)


with BuildPart() as f1_50:
    add(f1_49.part)

    # F2_t318: cut F2_tool320
    add(f2_tool320_1.part, mode=Mode.SUBTRACT)


with BuildPart() as f4:
    # F3 (on Top) → F4 (new body)
    with BuildSketch(Plane.XY):
        with Locations((-110.0284866989, 45.3976067133)):
            Rectangle(F3_W, F3_H)
    extrude(amount=F4_DEPTH)

    # F5
    f5_edges = [f4.edges().sort_by_distance(p)[0] for p in [
        (-110.028487, 53.716107, 16.637),
        (-110.028487, 37.079107, 16.637),
        (-110.028487, 53.716107, 0),
        (-110.028487, 37.079107, 0),
    ]]
    fillet(f5_edges, radius=F5_R)

    # F6 (on face) → F7 (cut)
    with BuildSketch(Plane.YZ.offset(-90.9784866989)):
        with Locations((45.4611067133, 8.382)):
            Circle(F6_R)
    extrude(amount=-F7_DEPTH, mode=Mode.SUBTRACT)


solid = Compound([f1_50.part, f4.part])
